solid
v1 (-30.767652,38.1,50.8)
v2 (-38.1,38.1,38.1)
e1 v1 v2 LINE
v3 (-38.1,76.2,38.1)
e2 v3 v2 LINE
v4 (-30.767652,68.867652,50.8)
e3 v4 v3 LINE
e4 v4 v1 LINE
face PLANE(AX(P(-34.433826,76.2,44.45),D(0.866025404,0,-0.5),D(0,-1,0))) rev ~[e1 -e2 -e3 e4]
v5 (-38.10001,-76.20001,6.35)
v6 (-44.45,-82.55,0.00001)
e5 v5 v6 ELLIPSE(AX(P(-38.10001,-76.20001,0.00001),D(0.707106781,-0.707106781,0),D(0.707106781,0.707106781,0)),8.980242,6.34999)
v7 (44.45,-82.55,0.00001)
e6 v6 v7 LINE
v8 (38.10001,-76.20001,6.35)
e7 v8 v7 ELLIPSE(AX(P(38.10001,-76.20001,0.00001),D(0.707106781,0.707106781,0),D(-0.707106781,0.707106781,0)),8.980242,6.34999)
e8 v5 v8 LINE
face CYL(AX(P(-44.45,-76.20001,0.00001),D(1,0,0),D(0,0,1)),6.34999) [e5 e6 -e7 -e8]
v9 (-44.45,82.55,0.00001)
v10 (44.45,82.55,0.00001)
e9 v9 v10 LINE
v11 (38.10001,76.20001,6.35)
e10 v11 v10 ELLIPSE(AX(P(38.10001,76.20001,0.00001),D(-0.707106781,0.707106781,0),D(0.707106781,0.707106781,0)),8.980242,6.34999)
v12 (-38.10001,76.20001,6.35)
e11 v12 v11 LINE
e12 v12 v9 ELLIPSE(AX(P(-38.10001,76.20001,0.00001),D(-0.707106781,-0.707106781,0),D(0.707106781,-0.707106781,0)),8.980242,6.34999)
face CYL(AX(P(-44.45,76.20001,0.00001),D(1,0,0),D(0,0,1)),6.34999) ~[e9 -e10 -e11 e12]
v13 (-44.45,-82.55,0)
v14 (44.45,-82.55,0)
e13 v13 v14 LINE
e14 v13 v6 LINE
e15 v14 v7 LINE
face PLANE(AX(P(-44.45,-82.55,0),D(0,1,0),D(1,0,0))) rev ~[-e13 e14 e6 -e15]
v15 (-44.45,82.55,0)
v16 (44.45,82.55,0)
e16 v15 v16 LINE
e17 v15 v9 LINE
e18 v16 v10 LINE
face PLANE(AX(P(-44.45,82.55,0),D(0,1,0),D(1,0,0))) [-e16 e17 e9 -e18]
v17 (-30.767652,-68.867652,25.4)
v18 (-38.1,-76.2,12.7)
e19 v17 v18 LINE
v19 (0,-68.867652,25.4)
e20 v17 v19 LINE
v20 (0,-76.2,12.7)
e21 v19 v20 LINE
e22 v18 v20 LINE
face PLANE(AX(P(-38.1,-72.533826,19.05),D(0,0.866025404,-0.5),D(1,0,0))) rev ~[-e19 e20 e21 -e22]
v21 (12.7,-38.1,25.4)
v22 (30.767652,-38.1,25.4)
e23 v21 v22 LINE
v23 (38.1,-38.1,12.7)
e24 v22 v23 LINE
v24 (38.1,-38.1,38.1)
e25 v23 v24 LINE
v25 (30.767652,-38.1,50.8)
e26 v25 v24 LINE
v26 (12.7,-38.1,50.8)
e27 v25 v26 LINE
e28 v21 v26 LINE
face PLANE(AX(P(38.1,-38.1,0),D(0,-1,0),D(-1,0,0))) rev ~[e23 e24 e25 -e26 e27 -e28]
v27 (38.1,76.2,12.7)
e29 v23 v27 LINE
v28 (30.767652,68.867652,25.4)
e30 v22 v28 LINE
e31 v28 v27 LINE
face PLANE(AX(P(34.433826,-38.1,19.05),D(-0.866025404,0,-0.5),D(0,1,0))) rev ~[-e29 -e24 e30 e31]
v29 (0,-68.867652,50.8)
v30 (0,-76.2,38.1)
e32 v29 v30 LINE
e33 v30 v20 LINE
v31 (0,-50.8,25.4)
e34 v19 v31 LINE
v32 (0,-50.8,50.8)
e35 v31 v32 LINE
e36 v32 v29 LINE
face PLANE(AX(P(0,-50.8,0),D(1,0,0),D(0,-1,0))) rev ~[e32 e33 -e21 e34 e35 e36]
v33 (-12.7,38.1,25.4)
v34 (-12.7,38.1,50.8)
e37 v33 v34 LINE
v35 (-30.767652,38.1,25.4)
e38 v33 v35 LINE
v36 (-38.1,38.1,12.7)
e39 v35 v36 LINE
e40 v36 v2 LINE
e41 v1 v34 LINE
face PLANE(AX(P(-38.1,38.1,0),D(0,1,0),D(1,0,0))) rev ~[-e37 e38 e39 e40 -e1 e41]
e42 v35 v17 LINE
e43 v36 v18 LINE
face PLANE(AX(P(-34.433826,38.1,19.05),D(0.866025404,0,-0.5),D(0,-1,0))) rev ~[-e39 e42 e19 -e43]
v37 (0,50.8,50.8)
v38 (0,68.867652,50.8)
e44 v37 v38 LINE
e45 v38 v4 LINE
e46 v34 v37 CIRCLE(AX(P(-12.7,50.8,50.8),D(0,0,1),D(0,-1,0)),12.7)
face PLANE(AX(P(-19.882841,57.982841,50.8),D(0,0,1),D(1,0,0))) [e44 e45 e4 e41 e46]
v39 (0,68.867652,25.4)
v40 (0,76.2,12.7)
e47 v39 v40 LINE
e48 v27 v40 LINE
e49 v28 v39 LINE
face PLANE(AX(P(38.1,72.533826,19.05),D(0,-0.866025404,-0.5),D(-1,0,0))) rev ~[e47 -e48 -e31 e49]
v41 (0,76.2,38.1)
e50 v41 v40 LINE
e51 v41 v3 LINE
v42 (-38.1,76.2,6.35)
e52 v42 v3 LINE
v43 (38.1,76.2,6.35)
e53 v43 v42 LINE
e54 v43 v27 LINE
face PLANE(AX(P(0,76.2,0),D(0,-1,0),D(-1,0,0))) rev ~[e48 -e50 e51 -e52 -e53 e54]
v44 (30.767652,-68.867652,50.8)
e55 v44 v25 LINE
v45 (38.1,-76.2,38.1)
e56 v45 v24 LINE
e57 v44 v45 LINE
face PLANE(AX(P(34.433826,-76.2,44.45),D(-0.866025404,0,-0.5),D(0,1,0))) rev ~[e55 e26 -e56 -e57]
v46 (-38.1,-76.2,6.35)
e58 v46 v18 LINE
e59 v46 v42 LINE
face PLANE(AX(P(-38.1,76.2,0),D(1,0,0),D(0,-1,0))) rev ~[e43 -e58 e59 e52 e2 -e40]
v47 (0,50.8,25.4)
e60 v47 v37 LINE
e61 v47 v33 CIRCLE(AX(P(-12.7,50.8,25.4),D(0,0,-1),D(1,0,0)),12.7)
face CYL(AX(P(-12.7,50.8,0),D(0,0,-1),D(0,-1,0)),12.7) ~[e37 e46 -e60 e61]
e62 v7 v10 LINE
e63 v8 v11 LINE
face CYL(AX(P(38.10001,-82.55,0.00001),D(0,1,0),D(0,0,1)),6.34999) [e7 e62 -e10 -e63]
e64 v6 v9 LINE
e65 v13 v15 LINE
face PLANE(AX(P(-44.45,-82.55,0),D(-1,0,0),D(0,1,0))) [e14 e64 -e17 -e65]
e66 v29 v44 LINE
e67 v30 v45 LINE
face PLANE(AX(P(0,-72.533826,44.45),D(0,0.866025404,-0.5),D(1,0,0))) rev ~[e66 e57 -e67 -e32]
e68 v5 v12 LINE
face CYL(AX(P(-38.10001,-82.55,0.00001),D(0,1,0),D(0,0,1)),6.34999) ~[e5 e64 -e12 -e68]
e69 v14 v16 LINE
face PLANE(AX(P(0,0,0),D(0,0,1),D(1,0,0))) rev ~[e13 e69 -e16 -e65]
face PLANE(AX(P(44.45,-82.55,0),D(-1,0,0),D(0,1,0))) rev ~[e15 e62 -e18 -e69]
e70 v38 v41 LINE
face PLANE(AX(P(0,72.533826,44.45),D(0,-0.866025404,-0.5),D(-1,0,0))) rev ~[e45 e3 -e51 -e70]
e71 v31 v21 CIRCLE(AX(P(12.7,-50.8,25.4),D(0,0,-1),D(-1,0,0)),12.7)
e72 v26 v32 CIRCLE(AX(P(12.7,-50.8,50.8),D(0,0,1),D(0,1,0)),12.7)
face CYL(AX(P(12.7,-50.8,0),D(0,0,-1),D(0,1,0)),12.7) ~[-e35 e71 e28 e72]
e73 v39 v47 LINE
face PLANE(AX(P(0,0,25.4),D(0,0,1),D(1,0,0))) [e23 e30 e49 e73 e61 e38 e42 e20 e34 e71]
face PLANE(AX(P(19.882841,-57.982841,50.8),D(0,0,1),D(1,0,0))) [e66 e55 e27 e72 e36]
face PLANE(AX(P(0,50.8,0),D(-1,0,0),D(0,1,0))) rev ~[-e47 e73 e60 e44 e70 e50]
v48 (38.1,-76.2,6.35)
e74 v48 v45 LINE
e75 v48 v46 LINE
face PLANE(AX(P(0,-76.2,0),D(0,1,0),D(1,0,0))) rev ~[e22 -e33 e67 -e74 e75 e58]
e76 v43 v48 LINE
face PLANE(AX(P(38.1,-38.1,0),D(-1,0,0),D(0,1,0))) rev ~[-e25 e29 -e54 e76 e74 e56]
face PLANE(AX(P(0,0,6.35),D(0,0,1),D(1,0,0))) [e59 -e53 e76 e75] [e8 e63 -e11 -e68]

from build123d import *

# Parameters (mm, degrees)
F0_W     = 88.9
F0_H     = 165.1
F1_DEPTH = 6.35
F2_DEPTH = 25.4
F3_DEPTH = 50.8
F4_SIZE2 = 12.7
F4_SIZE  = 7.3323484187
F5_R     = 6.34999
F6_SIZE2 = 12.7
F6_SIZE  = 7.3323484187
F7_SIZE2 = 12.7
F7_SIZE  = 7.3323484187


# Not quite as in the source:
# - a fillet or chamfer is up to 0.001 mm smaller than in the source, because OpenCascade refuses the exact size


with BuildPart() as f1:
    # F0 (on Top) → F1 (new body)
    with BuildSketch(Plane.XY):
        Rectangle(F0_W, F0_H)
        Polygon((-38.1, 38.1), (-38.1, 76.2), (0, 76.2), (38.1, 76.2), (38.1, -38.1), (38.1, -76.2), (0, -76.2), (-38.1, -76.2), align=None, mode=Mode.SUBTRACT)
    extrude(amount=F1_DEPTH)

    # F0 (on Top) → F2 (join)
    with BuildSketch(Plane.XY):
        with BuildLine():
            Line((38.1, 76.2), (0, 76.2))
            Line((0, 76.2), (0, 50.8))
            ThreePointArc((0, 50.8), (-3.7197438789, 41.8197438789), (-12.7, 38.1))
            Line((-12.7, 38.1), (-38.1, 38.1))
            Line((-38.1, 38.1), (-38.1, -76.2))
            Line((-38.1, -76.2), (0, -76.2))
            Line((0, -76.2), (0, -50.8))
            ThreePointArc((0, -50.8), (3.7197438789, -41.8197438789), (12.7, -38.1))
            Line((12.7, -38.1), (38.1, -38.1))
            Line((38.1, -38.1), (38.1, 76.2))
        make_face()
    extrude(amount=F2_DEPTH)

    # F0 (on Top) → F3 (join)
    with BuildSketch(Plane.XY):
        with BuildLine():
            Line((0, 76.2), (-38.1, 76.2))
            Line((-38.1, 76.2), (-38.1, 38.1))
            Line((-38.1, 38.1), (-12.7, 38.1))
            ThreePointArc((-12.7, 38.1), (-3.7197438789, 41.8197438789), (0, 50.8))
            Line((0, 50.8), (0, 76.2))
        make_face()
        with BuildLine():
            Line((38.1, -76.2), (38.1, -38.1))
            Line((38.1, -38.1), (12.7, -38.1))
            ThreePointArc((12.7, -38.1), (3.7197438789, -41.8197438789), (0, -50.8))
            Line((0, -50.8), (0, -76.2))
            Line((0, -76.2), (38.1, -76.2))
        make_face()
    extrude(amount=F3_DEPTH)

    # F4
    f4_edges = [f1.edges().sort_by_distance(p)[0] for p in [
        (38.1, 19.05, 25.4),
        (-19.05, -76.2, 25.4),
        (-38.1, -19.05, 25.4),
        (19.05, 76.2, 25.4),
    ]]
    f4_side = f1.faces().sort_by_distance((0, 0, 25.4))[0]
    chamfer(f4_edges, length=F4_SIZE, length2=F4_SIZE2, reference=f4_side)

    # F5 (radius 6.35 in the source; OpenCascade refuses exactly that, so slightly less here)
    f5_edges = [f1.edges().sort_by_distance(p)[0] for p in [
        (0, 82.55, 6.35),
        (-44.45, 0, 6.35),
        (44.45, 0, 6.35),
        (0, -82.55, 6.35),
    ]]
    fillet(f5_edges, radius=F5_R)

    # F6
    f6_edges = [f1.edges().sort_by_distance(p)[0] for p in [
        (19.05, -76.2, 50.8),
        (38.1, -57.15, 50.8),
    ]]
    f6_side = f1.faces().sort_by_distance((19.446042, -57.546042, 50.8))[0]
    chamfer(f6_edges, length=F6_SIZE, length2=F6_SIZE2, reference=f6_side)

    # F7
    f7_edges = [f1.edges().sort_by_distance(p)[0] for p in [
        (-19.05, 76.2, 50.8),
        (-38.1, 57.15, 50.8),
    ]]
    f7_side = f1.faces().sort_by_distance((-19.446042, 57.546042, 50.8))[0]
    chamfer(f7_edges, length=F7_SIZE, length2=F7_SIZE2, reference=f7_side)


solid = f1.part
